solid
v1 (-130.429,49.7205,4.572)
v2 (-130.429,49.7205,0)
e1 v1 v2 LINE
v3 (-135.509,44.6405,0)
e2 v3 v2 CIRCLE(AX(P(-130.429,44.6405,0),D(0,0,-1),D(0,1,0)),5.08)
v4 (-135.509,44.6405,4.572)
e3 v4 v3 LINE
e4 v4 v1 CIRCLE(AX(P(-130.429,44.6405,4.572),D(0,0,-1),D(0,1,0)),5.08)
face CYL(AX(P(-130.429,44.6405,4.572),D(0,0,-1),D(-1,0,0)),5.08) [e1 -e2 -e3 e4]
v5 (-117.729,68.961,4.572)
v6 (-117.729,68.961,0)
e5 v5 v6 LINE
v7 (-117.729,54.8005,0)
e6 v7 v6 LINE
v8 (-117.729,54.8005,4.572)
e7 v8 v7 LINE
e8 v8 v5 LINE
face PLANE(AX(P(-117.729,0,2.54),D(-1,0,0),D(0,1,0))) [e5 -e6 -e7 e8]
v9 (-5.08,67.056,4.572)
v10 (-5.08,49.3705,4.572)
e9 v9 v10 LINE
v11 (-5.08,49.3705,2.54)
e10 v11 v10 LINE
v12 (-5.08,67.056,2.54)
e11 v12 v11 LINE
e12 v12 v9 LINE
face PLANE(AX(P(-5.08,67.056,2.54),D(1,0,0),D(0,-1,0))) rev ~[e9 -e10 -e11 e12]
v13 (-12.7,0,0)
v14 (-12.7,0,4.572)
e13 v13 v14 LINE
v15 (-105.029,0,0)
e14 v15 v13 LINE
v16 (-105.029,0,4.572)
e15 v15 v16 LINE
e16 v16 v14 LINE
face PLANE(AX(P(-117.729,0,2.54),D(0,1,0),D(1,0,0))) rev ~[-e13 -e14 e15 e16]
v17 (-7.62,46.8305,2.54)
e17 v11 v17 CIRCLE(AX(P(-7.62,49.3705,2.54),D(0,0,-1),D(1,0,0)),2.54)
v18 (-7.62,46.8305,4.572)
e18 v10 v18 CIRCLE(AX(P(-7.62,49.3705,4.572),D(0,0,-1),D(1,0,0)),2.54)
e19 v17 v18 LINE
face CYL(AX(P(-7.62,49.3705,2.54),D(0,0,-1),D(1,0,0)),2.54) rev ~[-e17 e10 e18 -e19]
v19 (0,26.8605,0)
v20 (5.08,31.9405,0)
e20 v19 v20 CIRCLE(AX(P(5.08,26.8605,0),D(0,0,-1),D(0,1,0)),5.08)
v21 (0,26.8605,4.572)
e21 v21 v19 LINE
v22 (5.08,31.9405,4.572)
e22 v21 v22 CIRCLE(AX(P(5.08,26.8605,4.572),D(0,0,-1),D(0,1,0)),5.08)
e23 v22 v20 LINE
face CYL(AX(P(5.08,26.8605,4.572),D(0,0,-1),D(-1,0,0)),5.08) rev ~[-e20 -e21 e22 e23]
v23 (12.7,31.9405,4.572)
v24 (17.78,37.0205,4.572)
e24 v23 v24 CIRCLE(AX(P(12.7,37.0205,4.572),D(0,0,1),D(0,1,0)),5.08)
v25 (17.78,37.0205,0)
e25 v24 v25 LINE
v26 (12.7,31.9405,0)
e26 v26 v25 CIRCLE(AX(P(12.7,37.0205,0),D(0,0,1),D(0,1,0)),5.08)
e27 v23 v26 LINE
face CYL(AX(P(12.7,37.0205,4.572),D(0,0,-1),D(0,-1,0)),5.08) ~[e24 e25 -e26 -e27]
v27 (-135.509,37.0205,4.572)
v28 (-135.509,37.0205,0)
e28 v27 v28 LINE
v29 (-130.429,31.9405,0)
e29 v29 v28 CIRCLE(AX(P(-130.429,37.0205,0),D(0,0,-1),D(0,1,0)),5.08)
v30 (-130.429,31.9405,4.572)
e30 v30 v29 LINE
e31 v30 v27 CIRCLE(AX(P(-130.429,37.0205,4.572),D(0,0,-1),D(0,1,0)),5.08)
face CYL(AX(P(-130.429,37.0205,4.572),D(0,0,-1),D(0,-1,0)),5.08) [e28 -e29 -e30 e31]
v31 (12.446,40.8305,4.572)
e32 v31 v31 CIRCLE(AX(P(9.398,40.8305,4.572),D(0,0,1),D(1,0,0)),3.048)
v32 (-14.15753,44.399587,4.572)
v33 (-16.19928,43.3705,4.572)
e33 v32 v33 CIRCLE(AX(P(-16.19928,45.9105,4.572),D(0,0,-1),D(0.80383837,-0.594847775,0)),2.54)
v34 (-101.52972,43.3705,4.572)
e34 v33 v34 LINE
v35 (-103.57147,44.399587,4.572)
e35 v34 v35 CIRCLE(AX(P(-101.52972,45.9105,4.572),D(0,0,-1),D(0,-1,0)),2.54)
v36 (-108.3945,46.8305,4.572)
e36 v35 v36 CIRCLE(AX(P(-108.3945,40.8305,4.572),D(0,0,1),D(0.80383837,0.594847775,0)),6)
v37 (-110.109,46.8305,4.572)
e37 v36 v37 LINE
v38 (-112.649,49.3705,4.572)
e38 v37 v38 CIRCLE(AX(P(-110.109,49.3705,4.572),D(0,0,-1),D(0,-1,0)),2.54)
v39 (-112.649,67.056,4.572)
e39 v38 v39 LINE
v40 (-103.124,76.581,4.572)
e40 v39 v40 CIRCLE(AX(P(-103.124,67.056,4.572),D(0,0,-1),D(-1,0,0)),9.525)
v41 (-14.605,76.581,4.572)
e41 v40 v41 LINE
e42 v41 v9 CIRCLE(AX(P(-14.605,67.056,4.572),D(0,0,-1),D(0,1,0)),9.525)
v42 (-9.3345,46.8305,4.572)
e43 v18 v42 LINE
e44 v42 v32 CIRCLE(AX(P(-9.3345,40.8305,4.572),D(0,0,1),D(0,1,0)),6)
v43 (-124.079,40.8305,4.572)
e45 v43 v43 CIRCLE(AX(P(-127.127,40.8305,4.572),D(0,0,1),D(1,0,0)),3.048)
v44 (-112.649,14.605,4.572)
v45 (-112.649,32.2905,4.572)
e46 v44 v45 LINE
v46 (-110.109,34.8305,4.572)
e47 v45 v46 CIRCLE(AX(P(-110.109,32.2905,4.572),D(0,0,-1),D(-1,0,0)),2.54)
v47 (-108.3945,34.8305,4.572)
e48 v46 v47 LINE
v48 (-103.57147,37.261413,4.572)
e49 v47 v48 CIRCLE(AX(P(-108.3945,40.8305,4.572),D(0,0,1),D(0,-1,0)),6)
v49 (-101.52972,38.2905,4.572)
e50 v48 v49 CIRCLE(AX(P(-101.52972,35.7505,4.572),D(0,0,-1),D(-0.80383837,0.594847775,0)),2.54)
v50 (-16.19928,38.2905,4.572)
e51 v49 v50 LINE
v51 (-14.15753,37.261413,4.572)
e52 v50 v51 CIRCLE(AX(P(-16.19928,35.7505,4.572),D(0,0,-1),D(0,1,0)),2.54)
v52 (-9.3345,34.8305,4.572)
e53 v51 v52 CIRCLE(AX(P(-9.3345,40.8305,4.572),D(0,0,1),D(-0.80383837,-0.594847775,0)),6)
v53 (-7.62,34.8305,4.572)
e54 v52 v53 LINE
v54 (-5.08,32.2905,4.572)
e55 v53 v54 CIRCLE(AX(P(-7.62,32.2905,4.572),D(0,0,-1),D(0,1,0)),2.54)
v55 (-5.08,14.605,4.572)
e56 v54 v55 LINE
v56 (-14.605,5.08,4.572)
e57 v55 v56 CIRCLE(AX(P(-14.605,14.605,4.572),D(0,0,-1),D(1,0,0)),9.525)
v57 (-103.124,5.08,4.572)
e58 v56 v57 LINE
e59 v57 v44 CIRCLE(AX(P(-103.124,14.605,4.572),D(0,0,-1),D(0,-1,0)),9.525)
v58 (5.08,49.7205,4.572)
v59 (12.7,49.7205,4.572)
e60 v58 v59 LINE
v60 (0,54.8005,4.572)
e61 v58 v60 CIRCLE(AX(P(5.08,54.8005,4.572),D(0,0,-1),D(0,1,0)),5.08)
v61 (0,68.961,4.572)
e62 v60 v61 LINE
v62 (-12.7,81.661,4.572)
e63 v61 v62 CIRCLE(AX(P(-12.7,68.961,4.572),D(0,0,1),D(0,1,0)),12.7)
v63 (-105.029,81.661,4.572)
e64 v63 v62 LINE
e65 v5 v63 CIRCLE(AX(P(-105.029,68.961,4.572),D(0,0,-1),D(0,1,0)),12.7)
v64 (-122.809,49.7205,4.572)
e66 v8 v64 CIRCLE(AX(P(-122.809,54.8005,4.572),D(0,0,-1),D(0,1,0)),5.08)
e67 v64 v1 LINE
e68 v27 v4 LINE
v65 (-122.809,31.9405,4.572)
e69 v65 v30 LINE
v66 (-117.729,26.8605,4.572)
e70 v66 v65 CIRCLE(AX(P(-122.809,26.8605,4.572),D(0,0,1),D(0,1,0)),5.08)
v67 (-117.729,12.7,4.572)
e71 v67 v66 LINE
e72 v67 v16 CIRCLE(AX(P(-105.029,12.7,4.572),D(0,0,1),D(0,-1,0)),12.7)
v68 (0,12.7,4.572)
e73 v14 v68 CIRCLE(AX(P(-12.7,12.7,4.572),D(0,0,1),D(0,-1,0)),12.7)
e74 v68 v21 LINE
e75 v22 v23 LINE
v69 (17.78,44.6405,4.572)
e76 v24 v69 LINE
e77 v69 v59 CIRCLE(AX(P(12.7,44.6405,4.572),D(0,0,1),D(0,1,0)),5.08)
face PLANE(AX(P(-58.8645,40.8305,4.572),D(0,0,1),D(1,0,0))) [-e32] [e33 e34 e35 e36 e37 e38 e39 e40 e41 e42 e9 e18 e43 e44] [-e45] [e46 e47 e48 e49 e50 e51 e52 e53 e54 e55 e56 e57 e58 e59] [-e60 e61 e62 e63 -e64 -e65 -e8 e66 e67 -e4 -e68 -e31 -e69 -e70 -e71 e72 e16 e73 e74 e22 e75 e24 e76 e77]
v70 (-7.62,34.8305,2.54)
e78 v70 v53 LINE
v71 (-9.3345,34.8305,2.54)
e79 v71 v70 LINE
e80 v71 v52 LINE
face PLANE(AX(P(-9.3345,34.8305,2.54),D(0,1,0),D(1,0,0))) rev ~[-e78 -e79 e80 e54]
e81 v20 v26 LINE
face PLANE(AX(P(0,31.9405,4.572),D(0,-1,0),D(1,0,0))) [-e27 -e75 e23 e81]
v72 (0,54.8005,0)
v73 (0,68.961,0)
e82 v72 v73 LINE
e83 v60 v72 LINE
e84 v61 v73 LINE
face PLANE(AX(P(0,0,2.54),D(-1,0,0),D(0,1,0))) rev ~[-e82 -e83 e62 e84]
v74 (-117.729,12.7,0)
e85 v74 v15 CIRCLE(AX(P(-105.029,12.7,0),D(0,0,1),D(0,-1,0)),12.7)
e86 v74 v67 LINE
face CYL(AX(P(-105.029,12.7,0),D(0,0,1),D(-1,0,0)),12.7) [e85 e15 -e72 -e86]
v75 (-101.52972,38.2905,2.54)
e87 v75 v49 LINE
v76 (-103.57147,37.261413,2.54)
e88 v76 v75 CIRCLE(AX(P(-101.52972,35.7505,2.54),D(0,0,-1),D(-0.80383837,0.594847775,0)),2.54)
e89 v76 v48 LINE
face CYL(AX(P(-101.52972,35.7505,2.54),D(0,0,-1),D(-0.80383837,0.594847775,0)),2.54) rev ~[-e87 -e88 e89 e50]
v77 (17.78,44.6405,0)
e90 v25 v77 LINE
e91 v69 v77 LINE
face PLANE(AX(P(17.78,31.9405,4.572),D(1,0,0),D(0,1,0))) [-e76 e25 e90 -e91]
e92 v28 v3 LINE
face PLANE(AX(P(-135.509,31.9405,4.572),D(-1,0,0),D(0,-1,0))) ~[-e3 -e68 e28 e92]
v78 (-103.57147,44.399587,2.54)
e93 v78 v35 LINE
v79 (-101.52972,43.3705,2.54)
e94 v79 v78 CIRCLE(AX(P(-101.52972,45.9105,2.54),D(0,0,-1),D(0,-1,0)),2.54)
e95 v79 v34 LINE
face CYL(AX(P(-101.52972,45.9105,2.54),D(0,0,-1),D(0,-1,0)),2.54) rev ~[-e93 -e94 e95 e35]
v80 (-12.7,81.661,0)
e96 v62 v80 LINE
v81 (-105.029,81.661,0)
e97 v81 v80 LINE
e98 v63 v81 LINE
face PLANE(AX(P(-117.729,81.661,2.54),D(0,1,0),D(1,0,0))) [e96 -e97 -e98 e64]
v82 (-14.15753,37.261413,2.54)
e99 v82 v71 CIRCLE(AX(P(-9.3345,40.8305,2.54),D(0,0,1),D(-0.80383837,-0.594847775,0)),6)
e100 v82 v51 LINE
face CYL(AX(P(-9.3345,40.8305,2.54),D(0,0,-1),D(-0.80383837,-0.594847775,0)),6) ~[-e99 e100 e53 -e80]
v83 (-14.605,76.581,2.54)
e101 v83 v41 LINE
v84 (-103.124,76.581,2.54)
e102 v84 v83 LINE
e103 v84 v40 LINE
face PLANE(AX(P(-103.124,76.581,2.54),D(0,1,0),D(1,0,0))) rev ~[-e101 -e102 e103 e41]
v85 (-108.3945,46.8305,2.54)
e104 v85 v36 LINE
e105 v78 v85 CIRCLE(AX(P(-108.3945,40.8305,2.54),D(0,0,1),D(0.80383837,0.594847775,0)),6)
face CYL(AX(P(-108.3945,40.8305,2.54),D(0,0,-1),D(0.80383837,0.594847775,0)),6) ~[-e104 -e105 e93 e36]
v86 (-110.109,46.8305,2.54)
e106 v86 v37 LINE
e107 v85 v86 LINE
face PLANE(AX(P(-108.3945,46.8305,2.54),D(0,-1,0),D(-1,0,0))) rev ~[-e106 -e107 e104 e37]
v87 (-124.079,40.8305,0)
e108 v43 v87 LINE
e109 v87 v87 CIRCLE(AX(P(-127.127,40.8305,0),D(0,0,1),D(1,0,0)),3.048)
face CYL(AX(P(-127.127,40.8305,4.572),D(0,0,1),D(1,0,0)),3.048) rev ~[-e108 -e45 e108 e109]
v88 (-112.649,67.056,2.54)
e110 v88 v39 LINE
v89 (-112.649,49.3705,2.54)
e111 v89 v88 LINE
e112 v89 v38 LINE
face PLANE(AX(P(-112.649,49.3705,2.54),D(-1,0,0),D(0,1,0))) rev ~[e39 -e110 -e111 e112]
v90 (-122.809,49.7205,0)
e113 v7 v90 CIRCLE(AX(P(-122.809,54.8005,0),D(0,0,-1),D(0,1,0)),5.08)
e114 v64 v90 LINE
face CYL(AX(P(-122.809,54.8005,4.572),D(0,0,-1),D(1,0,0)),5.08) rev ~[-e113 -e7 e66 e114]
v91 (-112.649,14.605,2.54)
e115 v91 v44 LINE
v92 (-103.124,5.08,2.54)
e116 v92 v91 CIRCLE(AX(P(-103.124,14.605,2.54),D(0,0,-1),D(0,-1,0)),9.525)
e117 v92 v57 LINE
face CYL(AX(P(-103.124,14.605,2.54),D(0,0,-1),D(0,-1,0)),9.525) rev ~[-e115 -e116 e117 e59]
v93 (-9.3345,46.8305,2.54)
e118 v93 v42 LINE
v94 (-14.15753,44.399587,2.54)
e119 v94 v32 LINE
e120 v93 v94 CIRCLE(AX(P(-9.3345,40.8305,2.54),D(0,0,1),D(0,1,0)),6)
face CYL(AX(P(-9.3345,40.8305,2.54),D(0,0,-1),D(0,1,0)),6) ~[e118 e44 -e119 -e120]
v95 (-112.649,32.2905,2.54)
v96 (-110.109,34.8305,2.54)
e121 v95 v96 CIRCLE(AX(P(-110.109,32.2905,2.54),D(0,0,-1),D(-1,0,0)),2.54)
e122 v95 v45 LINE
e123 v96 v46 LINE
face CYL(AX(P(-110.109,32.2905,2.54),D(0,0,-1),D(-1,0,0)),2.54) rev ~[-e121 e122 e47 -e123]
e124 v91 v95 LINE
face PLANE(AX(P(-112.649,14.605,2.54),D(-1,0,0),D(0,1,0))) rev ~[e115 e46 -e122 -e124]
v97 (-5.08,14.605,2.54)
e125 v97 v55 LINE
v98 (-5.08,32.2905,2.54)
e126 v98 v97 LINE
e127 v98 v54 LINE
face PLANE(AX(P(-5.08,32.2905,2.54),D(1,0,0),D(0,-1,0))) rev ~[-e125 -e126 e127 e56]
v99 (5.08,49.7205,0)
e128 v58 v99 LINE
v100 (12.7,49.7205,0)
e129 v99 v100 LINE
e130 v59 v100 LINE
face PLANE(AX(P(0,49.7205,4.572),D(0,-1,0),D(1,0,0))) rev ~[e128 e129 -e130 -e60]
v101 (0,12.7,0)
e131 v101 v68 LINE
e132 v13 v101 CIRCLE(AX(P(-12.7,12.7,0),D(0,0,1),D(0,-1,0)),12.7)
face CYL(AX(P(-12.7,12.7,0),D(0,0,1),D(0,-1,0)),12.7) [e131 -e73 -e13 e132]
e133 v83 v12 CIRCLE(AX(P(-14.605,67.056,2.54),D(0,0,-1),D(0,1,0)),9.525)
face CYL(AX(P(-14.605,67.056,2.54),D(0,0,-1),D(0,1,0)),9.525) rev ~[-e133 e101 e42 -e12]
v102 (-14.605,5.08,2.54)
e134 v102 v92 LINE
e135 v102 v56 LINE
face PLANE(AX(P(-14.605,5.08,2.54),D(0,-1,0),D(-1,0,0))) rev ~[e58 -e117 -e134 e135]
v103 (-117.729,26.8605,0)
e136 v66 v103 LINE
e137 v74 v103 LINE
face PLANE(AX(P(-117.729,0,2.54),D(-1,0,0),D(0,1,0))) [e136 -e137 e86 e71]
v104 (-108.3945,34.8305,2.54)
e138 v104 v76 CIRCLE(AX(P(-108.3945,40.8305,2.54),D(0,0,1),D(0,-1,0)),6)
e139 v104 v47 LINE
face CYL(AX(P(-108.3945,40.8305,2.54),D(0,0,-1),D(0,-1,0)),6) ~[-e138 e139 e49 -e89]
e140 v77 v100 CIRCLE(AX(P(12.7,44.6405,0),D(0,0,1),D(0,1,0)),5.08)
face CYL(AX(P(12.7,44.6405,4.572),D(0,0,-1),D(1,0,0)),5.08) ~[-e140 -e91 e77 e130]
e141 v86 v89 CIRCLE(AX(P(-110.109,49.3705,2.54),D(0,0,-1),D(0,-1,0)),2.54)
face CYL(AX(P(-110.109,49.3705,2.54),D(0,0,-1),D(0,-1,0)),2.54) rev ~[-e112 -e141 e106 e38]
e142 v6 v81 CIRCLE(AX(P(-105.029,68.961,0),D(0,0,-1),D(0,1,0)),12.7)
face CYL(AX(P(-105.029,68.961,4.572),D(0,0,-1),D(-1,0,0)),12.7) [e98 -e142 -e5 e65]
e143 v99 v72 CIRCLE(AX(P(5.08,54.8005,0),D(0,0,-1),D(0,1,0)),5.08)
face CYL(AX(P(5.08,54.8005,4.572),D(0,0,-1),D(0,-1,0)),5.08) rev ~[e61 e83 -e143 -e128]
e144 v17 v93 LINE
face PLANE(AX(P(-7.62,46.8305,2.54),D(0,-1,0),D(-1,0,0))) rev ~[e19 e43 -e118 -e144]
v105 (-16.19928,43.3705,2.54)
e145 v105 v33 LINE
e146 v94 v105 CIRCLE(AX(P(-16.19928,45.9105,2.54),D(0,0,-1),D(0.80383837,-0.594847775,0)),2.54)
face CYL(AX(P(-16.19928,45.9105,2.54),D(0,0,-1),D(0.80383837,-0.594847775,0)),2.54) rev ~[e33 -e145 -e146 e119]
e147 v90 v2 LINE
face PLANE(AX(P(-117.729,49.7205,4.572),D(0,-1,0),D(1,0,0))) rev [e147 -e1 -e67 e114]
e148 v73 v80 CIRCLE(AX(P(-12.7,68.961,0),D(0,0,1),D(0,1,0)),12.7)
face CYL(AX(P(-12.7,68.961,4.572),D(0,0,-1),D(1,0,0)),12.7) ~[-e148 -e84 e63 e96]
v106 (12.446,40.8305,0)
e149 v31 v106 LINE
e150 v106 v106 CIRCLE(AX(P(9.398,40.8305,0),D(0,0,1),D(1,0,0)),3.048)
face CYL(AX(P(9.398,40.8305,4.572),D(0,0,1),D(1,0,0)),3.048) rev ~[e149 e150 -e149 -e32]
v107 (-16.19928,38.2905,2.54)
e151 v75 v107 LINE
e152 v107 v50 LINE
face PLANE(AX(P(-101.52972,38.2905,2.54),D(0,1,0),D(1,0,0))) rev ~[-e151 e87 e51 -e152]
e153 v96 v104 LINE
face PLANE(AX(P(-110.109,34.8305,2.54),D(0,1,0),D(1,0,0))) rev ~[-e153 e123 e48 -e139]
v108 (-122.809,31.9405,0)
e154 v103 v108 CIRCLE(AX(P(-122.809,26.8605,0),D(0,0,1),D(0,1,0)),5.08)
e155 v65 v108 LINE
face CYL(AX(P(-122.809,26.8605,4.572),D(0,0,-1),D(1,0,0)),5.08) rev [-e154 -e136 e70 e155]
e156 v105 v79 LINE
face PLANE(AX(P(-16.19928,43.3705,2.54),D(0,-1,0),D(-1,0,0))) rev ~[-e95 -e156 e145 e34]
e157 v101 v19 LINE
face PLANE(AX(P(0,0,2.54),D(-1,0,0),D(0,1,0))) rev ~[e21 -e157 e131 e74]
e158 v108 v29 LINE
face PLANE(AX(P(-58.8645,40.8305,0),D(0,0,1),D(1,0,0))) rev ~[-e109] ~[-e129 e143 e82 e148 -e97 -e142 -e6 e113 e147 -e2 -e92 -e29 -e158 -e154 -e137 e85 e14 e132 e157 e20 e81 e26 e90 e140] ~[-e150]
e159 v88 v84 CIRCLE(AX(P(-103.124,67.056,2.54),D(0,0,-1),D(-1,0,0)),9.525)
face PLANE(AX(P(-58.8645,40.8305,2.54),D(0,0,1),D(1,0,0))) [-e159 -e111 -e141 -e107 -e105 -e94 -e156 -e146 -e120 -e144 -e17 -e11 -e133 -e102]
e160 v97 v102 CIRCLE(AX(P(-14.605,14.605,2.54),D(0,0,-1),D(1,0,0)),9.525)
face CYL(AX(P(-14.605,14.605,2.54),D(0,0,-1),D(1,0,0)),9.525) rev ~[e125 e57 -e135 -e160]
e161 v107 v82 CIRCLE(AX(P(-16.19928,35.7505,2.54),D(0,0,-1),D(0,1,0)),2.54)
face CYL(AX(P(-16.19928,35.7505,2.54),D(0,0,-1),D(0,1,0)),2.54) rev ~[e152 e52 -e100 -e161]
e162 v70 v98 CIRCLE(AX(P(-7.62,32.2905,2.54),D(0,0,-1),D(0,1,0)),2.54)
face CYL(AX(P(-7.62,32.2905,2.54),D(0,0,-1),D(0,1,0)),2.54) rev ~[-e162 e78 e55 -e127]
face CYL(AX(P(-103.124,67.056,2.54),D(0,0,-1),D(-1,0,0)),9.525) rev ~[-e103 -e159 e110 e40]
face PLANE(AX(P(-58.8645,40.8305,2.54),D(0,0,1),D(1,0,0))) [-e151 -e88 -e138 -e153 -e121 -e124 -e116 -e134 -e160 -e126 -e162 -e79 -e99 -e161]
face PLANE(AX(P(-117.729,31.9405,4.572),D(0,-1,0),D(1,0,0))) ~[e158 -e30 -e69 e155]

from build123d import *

# Parameters (mm, degrees)
F0_W      = 117.729
F0_H      = 81.661
F1_DEPTH  = 2.54
F2_W      = 117.729
F2_H      = 81.661
F3_DEPTH  = 2.032
F4_R      = 12.7
F5_W      = 17.78
F5_H      = 17.78
F6_DEPTH  = 4.572
F7_R      = 5.08
F13_R     = 3.048
F14_DEPTH = 4.573


# Not quite as in the source:
# - a feature of the source that left no trace in its solid (it failed there, or was rolled back) is left out
# - a pattern or mirror of a feature is missing from the dataset's text; its kind, count and spacing are read off the source's solid


with BuildPart() as f1:
    # F0 (on Top) → F1 (new body)
    with BuildSketch(Plane.XY):
        with Locations((-58.8645, 40.8305)):
            Rectangle(F0_W, F0_H)
    extrude(amount=F1_DEPTH)

    # F2 (on face) → F3 (join)
    with BuildSketch(Plane.XY.offset(2.54)):
        with Locations((-58.8645, 40.8305)):
            Rectangle(F2_W, F2_H)
        with BuildLine():
            ThreePointArc((-5.08, 14.605), (-7.8698079092, 7.8698079092), (-14.605, 5.08))
            Line((-14.605, 5.08), (-103.124, 5.08))
            ThreePointArc((-103.124, 5.08), (-109.8591920908, 7.8698079092), (-112.649, 14.605))
            Line((-112.649, 14.605), (-112.649, 32.2905))
            ThreePointArc((-112.649, 32.2905), (-111.9050512242, 34.0865512242), (-110.109, 34.8305))
            Line((-110.109, 34.8305), (-108.3945, 34.8305))
            ThreePointArc((-108.3945, 34.8305), (-105.6939926316, 35.4725843649), (-103.5714697827, 37.2614133489))
            ThreePointArc((-103.5714697827, 37.2614133489), (-102.67293511, 38.0186842855), (-101.529720324, 38.2905))
            Line((-101.529720324, 38.2905), (-58.8645, 38.2905))
            Line((-58.8645, 38.2905), (-16.199279676, 38.2905))
            ThreePointArc((-16.199279676, 38.2905), (-15.05606489, 38.0186842855), (-14.1575302173, 37.2614133489))
            ThreePointArc((-14.1575302173, 37.2614133489), (-12.0350073684, 35.4725843649), (-9.3345, 34.8305))
            Line((-9.3345, 34.8305), (-7.62, 34.8305))
            ThreePointArc((-7.62, 34.8305), (-5.8239487758, 34.0865512242), (-5.08, 32.2905))
            Line((-5.08, 32.2905), (-5.08, 14.605))
        make_face(mode=Mode.SUBTRACT)
        with BuildLine():
            Line((-103.124, 76.581), (-14.605, 76.581))
            ThreePointArc((-14.605, 76.581), (-7.8698079092, 73.7911920908), (-5.08, 67.056))
            Line((-5.08, 67.056), (-5.08, 49.3705))
            ThreePointArc((-5.08, 49.3705), (-5.8239487758, 47.5744487758), (-7.62, 46.8305))
            Line((-7.62, 46.8305), (-9.3345, 46.8305))
            ThreePointArc((-9.3345, 46.8305), (-12.0350073684, 46.1884156351), (-14.1575302173, 44.3995866511))
            ThreePointArc((-14.1575302173, 44.3995866511), (-15.05606489, 43.6423157145), (-16.199279676, 43.3705))
            Line((-16.199279676, 43.3705), (-58.8645, 43.3705))
            Line((-58.8645, 43.3705), (-101.529720324, 43.3705))
            ThreePointArc((-101.529720324, 43.3705), (-102.67293511, 43.6423157145), (-103.5714697827, 44.3995866511))
            ThreePointArc((-103.5714697827, 44.3995866511), (-105.6939926316, 46.1884156351), (-108.3945, 46.8305))
            Line((-108.3945, 46.8305), (-110.109, 46.8305))
            ThreePointArc((-110.109, 46.8305), (-111.9050512242, 47.5744487758), (-112.649, 49.3705))
            Line((-112.649, 49.3705), (-112.649, 67.056))
            ThreePointArc((-112.649, 67.056), (-109.8591920908, 73.7911920908), (-103.124, 76.581))
        make_face(mode=Mode.SUBTRACT)
    extrude(amount=F3_DEPTH)

    # F4
    f4_edges = [f1.edges().sort_by_distance(p)[0] for p in [
        (-117.729, 0, 2.286),
        (-117.729, 81.661, 2.286),
        (0, 81.661, 2.286),
        (0, 0, 2.286),
    ]]
    fillet(f4_edges, radius=F4_R)

    # F5 (on face) → F6 (join, through all)
    with BuildSketch(Plane.XY.offset(4.572)):
        with Locations((8.89, 40.8305)):
            Rectangle(F5_W, F5_H)
    f6 = extrude(amount=-F6_DEPTH)

    # F6_copies: F6 across plane
    add(f6.mirror(Plane(origin=(-58.8645, 0, 0), x_dir=(0, 0, -1), z_dir=(-1, 0, 0))))

    # F7
    f7_edges = [f1.edges().sort_by_distance(p)[0] for p in [
        (0, 31.9405, 2.286),
        (0, 49.7205, 2.286),
        (17.78, 49.7205, 2.286),
        (17.78, 31.9405, 2.286),
        (-117.729, 49.7205, 2.286),
        (-117.729, 31.9405, 2.286),
        (-135.509, 49.7205, 2.286),
        (-135.509, 31.9405, 2.286),
    ]]
    fillet(f7_edges, radius=F7_R)

    # F13 (on face) → F14 (cut, through all)
    with BuildSketch(Plane.XY.offset(4.572)):
        with Locations((9.398, 40.8305)):
            Circle(F13_R)
        with Locations((-127.127, 40.8305)):
            Circle(F13_R)
    extrude(amount=-F14_DEPTH, mode=Mode.SUBTRACT)


solid = f1.part
